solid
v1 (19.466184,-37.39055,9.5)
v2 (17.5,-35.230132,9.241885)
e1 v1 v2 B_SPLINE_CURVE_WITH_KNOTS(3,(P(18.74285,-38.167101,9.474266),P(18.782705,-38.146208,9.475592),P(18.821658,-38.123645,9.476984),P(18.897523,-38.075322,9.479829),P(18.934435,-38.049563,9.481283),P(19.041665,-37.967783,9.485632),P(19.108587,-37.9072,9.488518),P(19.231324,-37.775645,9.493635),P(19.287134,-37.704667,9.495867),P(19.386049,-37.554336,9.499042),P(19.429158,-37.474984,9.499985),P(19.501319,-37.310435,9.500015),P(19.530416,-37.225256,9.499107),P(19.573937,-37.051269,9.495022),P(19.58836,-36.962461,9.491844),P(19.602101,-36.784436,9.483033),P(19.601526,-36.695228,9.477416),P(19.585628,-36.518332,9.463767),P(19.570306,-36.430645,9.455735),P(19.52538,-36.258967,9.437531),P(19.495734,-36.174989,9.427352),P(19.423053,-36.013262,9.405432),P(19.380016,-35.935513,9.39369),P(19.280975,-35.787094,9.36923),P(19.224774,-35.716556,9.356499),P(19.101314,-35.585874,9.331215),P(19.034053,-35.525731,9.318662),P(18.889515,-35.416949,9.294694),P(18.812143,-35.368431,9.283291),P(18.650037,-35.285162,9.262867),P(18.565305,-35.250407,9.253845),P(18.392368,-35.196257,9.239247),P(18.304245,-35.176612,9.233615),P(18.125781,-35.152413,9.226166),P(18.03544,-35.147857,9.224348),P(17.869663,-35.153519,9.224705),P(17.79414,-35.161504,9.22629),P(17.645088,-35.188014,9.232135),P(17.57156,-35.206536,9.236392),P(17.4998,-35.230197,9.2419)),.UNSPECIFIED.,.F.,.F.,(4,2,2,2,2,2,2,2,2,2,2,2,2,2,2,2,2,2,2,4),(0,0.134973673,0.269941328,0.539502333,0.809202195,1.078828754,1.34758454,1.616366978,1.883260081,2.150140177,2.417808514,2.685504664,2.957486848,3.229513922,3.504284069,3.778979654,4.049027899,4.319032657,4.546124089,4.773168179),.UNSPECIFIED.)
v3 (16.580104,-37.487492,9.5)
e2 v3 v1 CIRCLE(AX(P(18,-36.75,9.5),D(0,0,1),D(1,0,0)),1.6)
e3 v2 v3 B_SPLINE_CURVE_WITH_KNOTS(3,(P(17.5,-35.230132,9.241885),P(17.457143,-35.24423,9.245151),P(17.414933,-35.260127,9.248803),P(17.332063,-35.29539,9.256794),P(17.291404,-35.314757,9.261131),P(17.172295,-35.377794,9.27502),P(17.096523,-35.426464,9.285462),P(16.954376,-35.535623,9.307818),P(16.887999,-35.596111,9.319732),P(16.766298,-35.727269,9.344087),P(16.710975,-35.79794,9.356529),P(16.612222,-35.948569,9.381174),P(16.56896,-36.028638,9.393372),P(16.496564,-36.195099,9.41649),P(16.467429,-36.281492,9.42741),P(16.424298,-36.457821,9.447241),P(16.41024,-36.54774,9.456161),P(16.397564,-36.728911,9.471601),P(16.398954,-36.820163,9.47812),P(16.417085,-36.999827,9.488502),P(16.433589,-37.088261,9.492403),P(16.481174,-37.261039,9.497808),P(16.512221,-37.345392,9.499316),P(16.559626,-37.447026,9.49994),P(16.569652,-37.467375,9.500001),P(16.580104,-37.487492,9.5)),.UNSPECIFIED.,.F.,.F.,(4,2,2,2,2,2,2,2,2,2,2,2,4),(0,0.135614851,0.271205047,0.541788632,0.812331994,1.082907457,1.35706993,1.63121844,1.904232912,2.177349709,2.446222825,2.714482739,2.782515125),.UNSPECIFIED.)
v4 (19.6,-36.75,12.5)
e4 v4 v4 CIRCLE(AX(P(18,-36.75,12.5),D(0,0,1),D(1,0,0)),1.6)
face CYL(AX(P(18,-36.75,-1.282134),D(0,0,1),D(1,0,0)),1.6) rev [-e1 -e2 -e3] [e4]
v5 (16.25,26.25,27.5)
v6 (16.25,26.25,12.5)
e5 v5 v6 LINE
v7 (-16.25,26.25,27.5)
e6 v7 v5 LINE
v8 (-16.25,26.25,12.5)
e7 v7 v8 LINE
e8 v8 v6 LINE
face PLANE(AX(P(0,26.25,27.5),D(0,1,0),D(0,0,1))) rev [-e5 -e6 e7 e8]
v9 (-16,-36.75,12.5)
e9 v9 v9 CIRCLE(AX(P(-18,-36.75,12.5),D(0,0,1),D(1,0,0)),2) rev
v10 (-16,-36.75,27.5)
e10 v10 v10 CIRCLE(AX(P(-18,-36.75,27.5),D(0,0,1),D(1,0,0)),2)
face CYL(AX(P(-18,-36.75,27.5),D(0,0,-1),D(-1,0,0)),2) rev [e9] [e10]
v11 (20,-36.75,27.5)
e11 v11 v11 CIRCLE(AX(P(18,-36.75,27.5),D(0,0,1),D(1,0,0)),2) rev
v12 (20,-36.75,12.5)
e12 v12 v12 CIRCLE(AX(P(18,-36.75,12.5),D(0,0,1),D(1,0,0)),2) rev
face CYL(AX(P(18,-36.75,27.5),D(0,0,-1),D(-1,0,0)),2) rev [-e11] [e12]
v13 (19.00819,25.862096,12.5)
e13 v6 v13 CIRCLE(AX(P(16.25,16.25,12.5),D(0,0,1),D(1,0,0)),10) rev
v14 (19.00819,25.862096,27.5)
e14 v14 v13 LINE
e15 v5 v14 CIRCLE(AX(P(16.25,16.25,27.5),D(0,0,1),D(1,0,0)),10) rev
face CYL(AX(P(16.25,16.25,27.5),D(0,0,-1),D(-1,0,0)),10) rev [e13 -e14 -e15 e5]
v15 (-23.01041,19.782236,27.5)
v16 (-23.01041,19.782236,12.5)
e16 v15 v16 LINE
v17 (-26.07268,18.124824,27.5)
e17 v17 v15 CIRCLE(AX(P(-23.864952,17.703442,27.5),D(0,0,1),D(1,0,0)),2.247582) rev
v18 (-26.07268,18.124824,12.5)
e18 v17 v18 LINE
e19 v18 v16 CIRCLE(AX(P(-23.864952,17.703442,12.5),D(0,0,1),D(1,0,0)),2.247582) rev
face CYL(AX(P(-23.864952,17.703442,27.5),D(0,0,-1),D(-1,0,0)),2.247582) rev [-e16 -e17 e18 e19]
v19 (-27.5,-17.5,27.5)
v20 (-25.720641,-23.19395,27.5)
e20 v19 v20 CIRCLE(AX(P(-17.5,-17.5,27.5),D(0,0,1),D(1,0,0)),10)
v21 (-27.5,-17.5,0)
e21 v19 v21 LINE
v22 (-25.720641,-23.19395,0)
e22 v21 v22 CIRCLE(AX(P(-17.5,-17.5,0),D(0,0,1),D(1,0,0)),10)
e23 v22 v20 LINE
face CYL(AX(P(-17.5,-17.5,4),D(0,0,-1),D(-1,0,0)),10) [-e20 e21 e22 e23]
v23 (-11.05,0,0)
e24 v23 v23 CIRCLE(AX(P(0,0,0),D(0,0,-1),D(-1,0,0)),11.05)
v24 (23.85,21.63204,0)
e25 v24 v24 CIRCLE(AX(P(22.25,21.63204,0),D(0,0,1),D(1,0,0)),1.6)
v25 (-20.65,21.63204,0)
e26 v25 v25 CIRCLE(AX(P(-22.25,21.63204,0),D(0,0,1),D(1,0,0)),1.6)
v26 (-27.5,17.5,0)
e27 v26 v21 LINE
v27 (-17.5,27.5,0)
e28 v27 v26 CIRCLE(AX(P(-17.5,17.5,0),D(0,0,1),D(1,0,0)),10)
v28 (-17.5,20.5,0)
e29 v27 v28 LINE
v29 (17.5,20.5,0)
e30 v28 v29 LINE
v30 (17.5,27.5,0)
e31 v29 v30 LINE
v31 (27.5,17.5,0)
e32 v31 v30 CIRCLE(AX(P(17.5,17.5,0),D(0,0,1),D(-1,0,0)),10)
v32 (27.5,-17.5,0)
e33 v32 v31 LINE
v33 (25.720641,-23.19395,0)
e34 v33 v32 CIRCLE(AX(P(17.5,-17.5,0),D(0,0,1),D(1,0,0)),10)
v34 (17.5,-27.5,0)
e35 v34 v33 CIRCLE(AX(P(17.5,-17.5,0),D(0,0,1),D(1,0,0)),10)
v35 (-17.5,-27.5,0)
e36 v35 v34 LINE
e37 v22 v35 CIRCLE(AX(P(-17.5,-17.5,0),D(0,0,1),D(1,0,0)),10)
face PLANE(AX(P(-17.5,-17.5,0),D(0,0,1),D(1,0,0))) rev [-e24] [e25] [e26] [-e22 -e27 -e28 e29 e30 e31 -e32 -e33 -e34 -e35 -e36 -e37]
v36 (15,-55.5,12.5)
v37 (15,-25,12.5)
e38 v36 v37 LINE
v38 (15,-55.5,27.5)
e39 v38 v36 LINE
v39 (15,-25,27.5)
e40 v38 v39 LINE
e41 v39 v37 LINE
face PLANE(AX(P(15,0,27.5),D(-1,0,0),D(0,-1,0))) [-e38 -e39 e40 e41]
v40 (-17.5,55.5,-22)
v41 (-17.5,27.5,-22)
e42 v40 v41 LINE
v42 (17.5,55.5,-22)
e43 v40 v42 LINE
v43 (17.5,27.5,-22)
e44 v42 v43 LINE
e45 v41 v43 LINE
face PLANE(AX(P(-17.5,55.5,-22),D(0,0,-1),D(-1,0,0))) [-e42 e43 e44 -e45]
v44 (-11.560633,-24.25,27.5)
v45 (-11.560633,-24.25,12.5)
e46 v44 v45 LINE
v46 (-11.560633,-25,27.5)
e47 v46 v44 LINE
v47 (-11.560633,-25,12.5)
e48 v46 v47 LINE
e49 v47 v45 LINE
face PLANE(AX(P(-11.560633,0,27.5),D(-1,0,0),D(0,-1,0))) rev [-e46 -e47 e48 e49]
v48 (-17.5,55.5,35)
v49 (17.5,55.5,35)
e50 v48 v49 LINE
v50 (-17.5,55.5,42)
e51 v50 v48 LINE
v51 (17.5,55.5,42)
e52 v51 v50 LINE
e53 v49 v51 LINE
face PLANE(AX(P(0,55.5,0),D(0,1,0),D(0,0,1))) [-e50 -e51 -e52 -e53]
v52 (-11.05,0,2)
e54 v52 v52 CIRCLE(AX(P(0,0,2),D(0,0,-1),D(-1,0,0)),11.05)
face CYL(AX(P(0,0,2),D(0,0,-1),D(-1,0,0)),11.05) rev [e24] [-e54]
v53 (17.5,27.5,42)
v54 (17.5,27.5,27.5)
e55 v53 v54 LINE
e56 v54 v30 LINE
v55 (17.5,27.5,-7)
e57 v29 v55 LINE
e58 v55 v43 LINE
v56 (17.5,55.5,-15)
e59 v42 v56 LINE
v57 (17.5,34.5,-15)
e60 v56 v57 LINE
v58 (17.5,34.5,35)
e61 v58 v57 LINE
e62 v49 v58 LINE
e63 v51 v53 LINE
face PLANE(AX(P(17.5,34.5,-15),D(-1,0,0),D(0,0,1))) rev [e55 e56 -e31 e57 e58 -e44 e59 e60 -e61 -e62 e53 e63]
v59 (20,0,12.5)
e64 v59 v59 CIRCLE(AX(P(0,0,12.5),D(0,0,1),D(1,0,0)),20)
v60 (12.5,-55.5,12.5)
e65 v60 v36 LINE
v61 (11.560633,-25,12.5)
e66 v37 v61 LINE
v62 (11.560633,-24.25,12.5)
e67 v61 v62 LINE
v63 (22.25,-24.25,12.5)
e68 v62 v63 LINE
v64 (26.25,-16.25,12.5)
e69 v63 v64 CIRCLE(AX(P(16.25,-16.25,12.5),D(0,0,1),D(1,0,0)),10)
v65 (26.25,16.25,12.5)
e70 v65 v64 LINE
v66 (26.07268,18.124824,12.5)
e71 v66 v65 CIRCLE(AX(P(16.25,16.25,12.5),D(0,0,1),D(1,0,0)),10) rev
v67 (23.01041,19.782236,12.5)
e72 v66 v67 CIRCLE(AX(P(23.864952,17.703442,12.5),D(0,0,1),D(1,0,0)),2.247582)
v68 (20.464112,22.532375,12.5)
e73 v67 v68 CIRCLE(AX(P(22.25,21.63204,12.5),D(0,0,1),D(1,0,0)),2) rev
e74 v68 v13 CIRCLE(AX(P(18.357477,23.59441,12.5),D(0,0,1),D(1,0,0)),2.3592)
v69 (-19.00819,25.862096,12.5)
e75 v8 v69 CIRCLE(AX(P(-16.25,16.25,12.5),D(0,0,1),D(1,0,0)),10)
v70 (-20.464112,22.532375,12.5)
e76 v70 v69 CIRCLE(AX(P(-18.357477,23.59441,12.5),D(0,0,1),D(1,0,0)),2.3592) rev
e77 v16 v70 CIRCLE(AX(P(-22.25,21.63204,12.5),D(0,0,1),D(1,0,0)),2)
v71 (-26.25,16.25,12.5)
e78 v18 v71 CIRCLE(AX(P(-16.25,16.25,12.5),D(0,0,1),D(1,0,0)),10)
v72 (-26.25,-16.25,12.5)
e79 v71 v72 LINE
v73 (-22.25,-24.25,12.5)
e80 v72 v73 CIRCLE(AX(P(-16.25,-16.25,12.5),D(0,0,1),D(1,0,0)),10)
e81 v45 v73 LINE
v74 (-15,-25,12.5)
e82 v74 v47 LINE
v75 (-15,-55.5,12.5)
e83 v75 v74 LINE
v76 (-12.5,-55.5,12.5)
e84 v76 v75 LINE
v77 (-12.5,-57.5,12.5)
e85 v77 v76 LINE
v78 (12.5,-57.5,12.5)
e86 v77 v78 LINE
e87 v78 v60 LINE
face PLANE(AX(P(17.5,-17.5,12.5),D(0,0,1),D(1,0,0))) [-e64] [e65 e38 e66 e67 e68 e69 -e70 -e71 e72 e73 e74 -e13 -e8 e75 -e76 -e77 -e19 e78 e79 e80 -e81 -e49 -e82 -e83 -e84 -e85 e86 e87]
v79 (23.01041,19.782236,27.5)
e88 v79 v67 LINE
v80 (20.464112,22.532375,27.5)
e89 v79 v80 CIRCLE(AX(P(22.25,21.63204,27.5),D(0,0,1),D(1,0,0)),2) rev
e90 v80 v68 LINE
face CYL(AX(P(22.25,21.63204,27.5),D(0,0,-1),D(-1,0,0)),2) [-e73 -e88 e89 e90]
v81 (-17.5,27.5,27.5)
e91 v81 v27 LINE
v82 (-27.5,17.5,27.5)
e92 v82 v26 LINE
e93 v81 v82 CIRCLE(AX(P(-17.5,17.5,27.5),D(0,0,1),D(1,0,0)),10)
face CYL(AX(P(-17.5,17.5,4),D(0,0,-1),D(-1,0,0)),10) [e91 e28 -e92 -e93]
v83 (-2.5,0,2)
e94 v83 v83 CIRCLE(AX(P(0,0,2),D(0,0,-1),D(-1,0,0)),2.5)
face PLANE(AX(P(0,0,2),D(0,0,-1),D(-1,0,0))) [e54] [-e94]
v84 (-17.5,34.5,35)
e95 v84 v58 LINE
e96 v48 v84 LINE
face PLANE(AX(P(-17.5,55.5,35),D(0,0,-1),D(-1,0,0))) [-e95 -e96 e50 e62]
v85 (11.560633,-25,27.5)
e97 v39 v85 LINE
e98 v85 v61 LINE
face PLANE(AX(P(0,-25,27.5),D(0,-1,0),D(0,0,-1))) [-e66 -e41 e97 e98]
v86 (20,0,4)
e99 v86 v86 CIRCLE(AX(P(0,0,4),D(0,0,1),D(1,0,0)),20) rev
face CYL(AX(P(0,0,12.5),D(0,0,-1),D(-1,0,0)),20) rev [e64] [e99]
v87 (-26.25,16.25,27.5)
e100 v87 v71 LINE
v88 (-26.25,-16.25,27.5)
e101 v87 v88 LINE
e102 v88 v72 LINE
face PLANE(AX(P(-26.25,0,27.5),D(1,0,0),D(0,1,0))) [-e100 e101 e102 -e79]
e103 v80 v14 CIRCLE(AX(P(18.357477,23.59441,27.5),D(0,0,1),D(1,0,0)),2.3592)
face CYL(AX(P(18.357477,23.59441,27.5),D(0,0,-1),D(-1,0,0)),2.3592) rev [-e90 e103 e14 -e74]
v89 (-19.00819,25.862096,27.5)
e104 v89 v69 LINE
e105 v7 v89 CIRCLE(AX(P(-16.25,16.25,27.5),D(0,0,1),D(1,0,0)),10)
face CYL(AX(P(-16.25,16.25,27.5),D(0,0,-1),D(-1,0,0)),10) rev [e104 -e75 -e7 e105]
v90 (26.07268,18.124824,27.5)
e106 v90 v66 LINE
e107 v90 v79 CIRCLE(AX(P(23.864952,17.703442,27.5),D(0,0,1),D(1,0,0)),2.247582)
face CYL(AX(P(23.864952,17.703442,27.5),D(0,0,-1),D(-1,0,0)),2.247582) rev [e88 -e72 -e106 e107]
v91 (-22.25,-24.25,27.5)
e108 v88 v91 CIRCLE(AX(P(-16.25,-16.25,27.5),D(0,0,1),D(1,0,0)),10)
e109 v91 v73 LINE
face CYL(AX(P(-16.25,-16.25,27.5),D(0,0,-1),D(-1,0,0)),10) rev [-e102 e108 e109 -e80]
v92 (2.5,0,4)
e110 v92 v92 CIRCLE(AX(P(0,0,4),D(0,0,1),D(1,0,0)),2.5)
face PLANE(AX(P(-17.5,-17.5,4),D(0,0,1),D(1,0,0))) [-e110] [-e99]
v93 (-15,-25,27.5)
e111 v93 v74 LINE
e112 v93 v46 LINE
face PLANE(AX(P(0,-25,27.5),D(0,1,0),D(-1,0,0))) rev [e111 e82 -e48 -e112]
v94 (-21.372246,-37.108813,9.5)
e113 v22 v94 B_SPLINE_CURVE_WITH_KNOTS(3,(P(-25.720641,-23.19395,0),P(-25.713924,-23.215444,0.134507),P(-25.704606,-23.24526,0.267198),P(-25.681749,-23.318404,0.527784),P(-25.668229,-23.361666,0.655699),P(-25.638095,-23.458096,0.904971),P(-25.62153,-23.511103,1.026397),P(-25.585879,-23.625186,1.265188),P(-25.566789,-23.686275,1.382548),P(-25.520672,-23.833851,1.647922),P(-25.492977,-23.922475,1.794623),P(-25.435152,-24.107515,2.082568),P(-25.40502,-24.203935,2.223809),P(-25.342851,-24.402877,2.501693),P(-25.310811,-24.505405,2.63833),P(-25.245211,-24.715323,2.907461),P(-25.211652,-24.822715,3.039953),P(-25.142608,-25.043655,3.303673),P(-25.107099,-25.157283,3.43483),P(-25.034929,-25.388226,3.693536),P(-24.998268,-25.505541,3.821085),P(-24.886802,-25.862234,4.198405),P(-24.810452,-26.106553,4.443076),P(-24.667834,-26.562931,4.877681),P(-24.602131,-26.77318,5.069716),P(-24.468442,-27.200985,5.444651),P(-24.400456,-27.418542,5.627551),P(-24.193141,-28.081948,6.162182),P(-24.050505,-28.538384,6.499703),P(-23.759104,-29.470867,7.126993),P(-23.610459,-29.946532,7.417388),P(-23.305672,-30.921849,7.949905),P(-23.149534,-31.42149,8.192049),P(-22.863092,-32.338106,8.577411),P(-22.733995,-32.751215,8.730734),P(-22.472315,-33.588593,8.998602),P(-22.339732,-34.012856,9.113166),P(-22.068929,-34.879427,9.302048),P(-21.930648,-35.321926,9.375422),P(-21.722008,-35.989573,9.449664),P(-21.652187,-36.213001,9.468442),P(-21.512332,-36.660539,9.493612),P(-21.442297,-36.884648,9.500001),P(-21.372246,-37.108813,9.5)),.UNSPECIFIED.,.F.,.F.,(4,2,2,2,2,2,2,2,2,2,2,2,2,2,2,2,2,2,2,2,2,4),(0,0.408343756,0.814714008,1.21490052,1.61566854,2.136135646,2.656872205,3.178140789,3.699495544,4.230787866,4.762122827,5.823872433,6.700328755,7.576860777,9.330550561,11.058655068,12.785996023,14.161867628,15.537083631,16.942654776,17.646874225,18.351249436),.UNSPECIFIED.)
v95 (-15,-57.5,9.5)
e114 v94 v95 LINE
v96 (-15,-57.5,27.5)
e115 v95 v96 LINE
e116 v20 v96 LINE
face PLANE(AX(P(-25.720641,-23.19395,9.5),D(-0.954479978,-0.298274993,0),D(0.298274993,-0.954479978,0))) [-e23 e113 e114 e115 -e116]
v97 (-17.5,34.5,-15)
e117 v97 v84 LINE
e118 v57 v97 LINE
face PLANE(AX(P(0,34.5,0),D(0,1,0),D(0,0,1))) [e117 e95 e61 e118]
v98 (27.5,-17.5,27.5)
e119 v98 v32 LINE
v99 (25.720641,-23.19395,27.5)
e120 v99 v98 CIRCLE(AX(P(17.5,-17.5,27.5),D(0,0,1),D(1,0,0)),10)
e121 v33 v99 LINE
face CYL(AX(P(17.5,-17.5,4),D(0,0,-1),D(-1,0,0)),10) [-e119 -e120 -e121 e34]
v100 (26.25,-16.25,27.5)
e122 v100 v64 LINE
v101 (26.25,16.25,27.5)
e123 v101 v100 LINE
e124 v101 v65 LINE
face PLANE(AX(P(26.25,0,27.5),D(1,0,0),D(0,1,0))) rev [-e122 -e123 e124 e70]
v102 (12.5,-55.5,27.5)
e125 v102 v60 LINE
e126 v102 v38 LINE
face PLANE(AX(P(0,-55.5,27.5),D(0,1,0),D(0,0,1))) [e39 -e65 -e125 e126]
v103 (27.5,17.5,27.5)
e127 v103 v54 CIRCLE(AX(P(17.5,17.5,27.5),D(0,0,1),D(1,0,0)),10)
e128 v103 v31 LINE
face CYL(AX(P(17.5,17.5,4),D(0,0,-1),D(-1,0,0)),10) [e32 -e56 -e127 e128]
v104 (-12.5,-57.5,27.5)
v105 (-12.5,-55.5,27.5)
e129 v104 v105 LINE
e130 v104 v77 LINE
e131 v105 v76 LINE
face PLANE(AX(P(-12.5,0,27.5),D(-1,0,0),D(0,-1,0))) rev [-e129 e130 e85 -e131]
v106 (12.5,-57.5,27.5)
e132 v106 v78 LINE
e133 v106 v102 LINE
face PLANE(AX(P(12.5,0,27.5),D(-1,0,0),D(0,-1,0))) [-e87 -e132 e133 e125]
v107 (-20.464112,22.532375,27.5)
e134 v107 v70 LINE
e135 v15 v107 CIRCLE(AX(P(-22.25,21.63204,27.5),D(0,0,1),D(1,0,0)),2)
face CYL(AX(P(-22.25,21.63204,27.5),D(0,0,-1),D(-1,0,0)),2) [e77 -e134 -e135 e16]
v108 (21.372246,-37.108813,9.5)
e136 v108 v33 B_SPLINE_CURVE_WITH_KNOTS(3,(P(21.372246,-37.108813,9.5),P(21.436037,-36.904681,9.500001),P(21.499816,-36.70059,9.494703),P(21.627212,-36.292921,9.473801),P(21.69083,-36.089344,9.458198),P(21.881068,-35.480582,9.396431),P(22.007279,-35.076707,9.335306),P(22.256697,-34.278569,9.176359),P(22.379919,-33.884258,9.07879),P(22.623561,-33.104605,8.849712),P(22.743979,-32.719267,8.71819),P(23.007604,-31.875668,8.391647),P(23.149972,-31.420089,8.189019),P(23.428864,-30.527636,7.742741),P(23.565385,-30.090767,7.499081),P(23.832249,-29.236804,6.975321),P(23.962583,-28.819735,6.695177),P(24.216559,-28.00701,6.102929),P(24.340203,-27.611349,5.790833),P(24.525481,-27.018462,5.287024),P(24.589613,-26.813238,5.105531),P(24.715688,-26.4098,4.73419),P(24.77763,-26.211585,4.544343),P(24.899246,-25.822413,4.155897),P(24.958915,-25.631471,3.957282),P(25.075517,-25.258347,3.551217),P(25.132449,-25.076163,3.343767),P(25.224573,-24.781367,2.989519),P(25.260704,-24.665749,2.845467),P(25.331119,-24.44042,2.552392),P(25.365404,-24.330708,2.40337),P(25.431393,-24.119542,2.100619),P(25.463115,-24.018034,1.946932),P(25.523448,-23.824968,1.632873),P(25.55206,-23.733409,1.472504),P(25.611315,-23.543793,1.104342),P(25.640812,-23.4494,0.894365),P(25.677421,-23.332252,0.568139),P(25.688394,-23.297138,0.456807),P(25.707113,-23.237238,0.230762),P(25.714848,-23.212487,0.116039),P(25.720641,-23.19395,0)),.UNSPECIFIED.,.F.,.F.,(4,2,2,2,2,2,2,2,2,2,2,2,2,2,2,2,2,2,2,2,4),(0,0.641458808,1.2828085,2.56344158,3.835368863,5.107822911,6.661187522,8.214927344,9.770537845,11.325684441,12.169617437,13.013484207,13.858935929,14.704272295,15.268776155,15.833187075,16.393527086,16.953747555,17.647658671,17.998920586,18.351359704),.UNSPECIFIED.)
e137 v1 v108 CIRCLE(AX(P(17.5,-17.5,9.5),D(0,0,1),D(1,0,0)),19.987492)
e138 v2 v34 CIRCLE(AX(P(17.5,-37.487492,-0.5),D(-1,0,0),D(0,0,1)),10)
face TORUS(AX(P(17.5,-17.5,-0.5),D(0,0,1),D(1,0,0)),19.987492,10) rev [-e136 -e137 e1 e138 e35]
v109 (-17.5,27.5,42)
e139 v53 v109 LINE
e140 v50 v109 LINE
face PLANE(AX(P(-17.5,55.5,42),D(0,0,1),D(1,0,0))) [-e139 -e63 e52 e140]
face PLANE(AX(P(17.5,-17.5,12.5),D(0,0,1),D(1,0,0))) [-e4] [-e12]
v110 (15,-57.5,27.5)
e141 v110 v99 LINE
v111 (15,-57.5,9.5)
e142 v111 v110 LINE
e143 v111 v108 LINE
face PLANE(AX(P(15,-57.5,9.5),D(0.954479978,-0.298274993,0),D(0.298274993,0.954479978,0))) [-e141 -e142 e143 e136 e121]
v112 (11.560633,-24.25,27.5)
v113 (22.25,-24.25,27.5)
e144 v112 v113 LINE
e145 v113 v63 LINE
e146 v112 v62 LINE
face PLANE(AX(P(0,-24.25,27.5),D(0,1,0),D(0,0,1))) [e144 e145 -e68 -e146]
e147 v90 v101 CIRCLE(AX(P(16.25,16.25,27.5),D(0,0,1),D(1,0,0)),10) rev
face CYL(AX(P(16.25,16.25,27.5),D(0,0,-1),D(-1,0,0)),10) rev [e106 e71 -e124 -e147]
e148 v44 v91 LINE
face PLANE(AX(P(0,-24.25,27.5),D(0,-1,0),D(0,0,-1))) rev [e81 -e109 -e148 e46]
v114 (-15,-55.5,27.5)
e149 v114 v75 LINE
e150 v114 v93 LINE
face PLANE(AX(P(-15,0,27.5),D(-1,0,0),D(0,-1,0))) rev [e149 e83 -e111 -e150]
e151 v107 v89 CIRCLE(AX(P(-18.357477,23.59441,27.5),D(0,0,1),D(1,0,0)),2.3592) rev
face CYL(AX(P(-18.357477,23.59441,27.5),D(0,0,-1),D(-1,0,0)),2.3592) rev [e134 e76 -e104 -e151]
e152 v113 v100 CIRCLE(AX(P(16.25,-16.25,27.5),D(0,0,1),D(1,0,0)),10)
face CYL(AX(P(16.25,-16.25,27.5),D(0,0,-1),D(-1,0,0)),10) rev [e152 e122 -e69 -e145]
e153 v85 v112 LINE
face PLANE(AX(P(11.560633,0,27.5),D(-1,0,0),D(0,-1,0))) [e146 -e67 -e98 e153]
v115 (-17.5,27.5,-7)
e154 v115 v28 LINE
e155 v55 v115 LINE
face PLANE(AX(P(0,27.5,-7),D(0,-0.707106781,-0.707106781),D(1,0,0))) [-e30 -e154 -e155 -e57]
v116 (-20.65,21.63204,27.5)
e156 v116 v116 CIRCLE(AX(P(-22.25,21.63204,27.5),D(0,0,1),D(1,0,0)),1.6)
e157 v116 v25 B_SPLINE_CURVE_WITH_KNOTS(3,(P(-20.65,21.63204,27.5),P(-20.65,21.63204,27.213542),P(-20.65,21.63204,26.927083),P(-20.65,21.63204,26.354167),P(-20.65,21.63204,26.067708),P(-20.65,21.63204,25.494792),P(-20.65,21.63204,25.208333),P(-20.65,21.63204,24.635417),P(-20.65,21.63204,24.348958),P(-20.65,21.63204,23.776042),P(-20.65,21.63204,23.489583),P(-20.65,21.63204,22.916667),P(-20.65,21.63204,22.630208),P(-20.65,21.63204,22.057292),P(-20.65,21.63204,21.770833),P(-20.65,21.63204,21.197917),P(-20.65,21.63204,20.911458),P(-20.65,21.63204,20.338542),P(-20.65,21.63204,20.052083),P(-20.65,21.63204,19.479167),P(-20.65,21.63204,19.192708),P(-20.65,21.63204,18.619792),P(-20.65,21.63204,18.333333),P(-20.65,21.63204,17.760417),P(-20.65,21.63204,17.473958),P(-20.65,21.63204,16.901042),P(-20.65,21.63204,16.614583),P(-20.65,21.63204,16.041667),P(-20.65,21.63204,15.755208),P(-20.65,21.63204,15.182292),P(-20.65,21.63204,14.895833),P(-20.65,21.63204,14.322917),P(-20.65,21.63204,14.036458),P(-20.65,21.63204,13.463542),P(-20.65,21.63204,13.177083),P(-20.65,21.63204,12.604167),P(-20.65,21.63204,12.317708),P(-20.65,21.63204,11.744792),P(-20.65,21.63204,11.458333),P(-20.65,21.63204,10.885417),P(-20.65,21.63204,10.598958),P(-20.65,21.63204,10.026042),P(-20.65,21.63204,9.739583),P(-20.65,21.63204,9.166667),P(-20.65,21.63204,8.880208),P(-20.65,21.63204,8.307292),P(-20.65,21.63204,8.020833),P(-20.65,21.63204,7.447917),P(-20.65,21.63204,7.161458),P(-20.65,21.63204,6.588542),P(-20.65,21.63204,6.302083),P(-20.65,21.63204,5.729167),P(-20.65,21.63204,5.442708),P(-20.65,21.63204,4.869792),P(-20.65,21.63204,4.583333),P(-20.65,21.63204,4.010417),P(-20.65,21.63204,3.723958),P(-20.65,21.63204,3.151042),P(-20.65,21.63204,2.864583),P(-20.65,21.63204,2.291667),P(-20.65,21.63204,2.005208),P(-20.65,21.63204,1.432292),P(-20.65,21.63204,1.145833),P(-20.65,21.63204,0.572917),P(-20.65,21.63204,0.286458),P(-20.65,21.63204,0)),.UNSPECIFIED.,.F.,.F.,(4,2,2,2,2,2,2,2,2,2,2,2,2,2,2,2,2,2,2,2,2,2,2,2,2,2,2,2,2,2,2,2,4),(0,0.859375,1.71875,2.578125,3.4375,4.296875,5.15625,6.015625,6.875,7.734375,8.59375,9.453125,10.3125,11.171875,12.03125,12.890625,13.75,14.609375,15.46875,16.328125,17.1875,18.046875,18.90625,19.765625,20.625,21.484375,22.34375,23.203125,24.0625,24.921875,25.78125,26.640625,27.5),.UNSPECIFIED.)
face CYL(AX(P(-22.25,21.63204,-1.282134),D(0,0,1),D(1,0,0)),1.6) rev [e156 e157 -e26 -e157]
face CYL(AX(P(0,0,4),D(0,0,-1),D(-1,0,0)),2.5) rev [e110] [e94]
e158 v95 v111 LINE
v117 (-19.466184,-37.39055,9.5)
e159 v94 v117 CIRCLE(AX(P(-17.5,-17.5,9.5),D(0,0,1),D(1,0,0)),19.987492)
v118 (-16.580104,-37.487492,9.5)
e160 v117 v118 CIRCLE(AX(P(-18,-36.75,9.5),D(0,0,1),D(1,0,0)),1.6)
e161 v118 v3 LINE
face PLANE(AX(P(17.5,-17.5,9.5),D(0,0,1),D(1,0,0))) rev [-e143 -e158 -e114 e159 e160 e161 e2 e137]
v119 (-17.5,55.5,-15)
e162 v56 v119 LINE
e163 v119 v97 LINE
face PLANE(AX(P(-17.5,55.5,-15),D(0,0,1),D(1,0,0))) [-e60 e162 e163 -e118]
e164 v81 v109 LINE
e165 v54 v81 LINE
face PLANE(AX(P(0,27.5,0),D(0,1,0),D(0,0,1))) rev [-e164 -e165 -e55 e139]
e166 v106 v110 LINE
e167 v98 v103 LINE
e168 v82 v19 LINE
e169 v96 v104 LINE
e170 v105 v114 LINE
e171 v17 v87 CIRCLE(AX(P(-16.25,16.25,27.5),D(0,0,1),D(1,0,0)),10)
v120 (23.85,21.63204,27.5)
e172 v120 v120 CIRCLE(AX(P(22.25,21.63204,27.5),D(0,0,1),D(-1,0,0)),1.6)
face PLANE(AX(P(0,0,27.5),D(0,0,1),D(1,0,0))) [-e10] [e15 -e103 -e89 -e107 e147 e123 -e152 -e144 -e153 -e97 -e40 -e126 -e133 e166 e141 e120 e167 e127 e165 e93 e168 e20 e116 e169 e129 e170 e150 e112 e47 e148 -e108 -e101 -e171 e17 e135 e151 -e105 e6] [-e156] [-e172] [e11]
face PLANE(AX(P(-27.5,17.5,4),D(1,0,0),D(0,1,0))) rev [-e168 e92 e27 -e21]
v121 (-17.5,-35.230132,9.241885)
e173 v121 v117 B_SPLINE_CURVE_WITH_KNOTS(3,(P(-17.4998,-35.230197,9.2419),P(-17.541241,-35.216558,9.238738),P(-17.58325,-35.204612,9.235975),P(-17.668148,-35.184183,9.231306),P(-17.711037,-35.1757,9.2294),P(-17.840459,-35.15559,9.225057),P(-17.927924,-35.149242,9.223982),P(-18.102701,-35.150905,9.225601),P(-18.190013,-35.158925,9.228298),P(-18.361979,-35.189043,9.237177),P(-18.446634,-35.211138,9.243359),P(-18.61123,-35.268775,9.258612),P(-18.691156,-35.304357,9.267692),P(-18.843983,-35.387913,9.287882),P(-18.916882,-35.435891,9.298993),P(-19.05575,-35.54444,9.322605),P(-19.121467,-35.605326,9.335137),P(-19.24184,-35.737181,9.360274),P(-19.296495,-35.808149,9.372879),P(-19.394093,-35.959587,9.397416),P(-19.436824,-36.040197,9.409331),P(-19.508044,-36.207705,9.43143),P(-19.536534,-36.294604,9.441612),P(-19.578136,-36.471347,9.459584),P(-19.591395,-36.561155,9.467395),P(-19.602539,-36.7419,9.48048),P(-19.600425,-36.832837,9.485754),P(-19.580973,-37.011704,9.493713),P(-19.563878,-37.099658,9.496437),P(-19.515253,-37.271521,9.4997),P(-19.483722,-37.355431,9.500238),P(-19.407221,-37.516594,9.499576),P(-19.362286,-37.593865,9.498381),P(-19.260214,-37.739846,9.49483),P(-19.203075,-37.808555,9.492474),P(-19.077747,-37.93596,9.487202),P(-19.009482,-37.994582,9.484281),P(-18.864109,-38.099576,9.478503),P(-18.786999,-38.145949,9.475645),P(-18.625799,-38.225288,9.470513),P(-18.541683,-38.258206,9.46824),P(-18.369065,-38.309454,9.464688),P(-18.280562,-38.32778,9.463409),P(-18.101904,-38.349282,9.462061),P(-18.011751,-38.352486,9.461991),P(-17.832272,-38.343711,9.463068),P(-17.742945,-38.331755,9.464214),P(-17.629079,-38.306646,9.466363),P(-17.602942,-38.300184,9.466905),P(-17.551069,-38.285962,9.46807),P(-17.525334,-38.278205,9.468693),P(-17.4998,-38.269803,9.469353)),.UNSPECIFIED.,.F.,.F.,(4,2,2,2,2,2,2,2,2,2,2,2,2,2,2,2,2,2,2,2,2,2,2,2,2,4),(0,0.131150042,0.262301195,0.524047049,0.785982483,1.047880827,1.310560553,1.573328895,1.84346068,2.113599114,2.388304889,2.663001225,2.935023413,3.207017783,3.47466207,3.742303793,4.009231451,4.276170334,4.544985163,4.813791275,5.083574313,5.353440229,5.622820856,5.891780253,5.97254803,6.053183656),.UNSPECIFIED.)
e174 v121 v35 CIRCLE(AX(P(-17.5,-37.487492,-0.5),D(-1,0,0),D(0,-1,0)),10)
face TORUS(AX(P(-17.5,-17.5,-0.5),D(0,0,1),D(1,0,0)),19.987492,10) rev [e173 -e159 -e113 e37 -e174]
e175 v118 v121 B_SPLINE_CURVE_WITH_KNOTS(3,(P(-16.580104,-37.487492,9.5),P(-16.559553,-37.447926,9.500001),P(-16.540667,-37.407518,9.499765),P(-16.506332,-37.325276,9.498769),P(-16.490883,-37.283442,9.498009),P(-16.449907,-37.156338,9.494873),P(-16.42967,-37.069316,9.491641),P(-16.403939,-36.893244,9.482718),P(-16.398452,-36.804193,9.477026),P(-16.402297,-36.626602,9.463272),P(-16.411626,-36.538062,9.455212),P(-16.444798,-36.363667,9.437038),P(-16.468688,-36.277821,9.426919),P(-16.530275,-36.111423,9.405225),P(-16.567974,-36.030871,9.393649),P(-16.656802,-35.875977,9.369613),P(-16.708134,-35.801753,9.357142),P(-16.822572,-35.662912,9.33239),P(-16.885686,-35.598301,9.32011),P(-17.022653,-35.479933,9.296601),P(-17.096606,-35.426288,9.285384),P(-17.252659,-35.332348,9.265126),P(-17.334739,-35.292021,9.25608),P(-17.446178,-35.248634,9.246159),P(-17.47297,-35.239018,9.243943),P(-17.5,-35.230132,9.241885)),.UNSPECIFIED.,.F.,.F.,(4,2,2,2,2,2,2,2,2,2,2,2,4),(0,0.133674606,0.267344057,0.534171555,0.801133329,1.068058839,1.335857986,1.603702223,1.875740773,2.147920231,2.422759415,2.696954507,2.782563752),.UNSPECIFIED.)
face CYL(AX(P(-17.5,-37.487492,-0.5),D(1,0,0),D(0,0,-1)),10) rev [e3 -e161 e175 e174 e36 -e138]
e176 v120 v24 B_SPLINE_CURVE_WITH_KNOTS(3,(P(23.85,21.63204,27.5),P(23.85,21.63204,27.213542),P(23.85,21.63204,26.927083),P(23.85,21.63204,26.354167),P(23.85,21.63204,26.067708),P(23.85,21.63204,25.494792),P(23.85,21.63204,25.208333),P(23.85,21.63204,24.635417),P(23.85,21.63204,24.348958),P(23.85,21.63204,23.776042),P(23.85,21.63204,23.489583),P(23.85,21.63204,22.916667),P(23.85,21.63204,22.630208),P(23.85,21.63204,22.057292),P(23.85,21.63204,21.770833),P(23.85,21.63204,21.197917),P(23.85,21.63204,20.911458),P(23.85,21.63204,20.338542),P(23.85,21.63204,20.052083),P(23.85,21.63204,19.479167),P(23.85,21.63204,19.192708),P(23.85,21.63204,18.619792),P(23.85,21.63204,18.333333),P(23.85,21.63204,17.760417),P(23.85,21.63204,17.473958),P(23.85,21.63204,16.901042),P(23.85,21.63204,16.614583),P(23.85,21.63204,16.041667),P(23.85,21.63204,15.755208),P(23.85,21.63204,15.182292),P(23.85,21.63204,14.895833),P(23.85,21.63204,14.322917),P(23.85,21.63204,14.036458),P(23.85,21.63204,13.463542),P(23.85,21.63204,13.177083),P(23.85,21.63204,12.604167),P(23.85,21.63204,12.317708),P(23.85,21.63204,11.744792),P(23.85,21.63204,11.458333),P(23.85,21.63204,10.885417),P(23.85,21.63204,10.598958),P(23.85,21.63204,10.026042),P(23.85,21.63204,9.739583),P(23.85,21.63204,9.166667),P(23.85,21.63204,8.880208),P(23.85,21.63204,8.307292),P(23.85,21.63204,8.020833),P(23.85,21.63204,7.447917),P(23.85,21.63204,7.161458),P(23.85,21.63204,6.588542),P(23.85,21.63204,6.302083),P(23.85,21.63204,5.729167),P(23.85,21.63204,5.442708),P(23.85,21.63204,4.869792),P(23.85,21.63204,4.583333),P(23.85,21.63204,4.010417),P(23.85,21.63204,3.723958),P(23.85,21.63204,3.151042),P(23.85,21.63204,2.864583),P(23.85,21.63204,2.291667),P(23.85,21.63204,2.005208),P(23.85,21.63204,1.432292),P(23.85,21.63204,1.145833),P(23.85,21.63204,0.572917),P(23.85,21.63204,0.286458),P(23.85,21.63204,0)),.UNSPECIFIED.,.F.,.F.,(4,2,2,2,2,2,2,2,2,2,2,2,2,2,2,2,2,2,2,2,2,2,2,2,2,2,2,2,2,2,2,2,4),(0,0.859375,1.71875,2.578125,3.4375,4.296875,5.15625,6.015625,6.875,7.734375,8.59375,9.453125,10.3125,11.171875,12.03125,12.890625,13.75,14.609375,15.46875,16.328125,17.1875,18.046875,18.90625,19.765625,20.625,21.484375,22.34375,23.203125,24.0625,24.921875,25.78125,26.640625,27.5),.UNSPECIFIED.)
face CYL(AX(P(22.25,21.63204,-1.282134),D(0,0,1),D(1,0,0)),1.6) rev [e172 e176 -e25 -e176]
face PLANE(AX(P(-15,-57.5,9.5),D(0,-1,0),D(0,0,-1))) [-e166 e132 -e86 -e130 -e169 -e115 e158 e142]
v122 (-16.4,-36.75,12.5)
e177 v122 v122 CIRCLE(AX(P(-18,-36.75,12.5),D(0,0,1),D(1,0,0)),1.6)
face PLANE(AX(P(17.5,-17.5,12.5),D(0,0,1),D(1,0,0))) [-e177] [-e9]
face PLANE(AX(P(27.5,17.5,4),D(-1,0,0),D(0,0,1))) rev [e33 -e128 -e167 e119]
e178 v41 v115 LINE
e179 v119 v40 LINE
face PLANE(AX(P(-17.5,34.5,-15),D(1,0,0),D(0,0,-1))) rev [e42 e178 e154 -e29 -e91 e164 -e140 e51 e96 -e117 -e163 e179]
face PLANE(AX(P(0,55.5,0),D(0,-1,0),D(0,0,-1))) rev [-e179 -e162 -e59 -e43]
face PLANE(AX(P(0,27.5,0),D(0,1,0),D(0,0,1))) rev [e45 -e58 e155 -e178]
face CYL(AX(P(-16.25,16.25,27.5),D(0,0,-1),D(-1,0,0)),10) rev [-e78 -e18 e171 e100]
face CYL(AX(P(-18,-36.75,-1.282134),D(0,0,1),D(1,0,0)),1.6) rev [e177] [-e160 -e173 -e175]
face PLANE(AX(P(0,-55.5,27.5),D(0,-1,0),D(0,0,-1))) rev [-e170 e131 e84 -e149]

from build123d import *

# Parameters (mm, degrees)
CROQUIS4_R                  = 2.5
SALIENTE_EXTRUIR1_DEPTH     = 4
CROQUIS5_R                  = 20
SALIENTE_EXTRUIR2_DEPTH     = 8.5
SALIENTE_EXTRUIR4_START     = -3
SALIENTE_EXTRUIR4_DEPTH     = 3
REDONDEO1_R                 = 10
SALIENTE_EXTRUIR5_OUTLINE_R = 2
SALIENTE_EXTRUIR5_DEPTH     = 15
CROQUIS9_R                  = 1.6
CORTAR_EXTRUIR1_DEPTH       = 70.417217007
CROQUIS11_W                 = 35
CROQUIS11_H                 = 50
SALIENTE_EXTRUIR7_DEPTH     = 7
CROQUIS12_W                 = 35
CROQUIS12_H                 = 7
SALIENTE_EXTRUIR8_DEPTH     = 28
CHAFL_N2_SIZE               = 7
CROQUIS13_R                 = 11.05
CORTAR_EXTRUIR2_DEPTH       = 2


# Read off the part's stored shape, not the designer's step: Saliente-Extruir5
with BuildPart() as part:
    # Croquis4 → Saliente-Extruir1 (new body)
    with BuildSketch(Plane.XY):
        with BuildLine():
            Line((-17.5, 27.5), (17.5, 27.5))
            ThreePointArc((17.5, 27.5), (24.571067812, 24.571067812), (27.5, 17.5))
            Line((27.5, 17.5), (27.5, -17.5))
            ThreePointArc((27.5, -17.5), (24.571067812, -24.571067812), (17.5, -27.5))
            Line((17.5, -27.5), (-17.5, -27.5))
            ThreePointArc((-17.5, -27.5), (-24.571067812, -24.571067812), (-27.5, -17.5))
            Line((-27.5, -17.5), (-27.5, 17.5))
            ThreePointArc((-27.5, 17.5), (-24.571067812, 24.571067812), (-17.5, 27.5))
        make_face()
        Circle(CROQUIS4_R, mode=Mode.SUBTRACT)
    extrude(amount=SALIENTE_EXTRUIR1_DEPTH)

    # Croquis5 → Saliente-Extruir2 (add)
    with BuildSketch(Plane.XY.offset(4)):
        with BuildLine():
            Line((-17.5, 27.5), (17.5, 27.5))
            ThreePointArc((17.5, 27.5), (24.571067812, 24.571067812), (27.5, 17.5))
            Line((27.5, 17.5), (27.5, -17.5))
            ThreePointArc((27.5, -17.5), (24.571067812, -24.571067812), (17.5, -27.5))
            Line((17.5, -27.5), (-17.5, -27.5))
            ThreePointArc((-17.5, -27.5), (-24.571067812, -24.571067812), (-27.5, -17.5))
            Line((-27.5, -17.5), (-27.5, 17.5))
            ThreePointArc((-27.5, 17.5), (-24.571067812, 24.571067812), (-17.5, 27.5))
        make_face()
        Circle(CROQUIS5_R, mode=Mode.SUBTRACT)
    extrude(amount=SALIENTE_EXTRUIR2_DEPTH)

    # Croquis6 → Saliente-Extruir4 (add)
    with BuildSketch(Plane.XY.offset(12.5).offset(SALIENTE_EXTRUIR4_START)):
        with BuildLine():
            Line((-25.720640569, -23.193950178), (-15, -57.5))
            Line((-15, -57.5), (15, -57.5))
            Line((15, -57.5), (25.720640569, -23.193950178))
            ThreePointArc((25.720640569, -23.193950178), (22.140069947, -26.358315353), (17.5, -27.5))
            Line((17.5, -27.5), (-17.5, -27.5))
            ThreePointArc((-17.5, -27.5), (-22.140069947, -26.358315353), (-25.720640569, -23.193950178))
        make_face()
    extrude(amount=SALIENTE_EXTRUIR4_DEPTH)

    # Redondeo1
    # the kernel refuses this fillet: 10 mm, written as the material it adds along each edge
    with BuildSketch(Plane(origin=(17.5, -17.5, 9.5), x_dir=(-0.31521717271258337, 0.949019564617656, 0), z_dir=(-0.949019564617656, -0.31521717271258337, 0))) as redondeo1_piece_1_section:
        with BuildLine():
            CenterArc((19.987492178, 10), REDONDEO1_R, 182.865983983, 87.134016017)
            Line((19.987492178, 0), (10, 0))
            Line((10, 0), (10, 9.5))
        make_face()
    redondeo1_piece_1 = revolve(axis=Axis((17.5, -17.5, 9.5), (0, 0, -1)), revolution_arc=198.373924806, mode=Mode.PRIVATE)
    redondeo1_piece_1 = split(redondeo1_piece_1, bisect_by=Plane(origin=(27.5, -26.624186886, 2.060383814), z_dir=(-1, 0, 0)), keep=Keep.TOP, mode=Mode.PRIVATE)
    redondeo1_piece_1 = redondeo1_piece_1 - Plane(origin=(0, 0, 2.060383814), x_dir=(1, 0, 0), z_dir=(0, 0, -1)) * Cylinder(20, 80, mode=Mode.PRIVATE)
    redondeo1_piece_1 = split(redondeo1_piece_1, bisect_by=Plane(origin=(24.437894836, -27.298736526, 2.060383814), z_dir=(-0.9544799780350299, 0.2982749931359464, 0)), keep=Keep.TOP, mode=Mode.PRIVATE)
    add(redondeo1_piece_1)
    with BuildSketch(Plane(origin=(-17.5, -17.5, 9.5), x_dir=(0, -1, 0), z_dir=(1, 0, 0))) as redondeo1_piece_2_section:
        with BuildLine():
            CenterArc((19.987492178, 10), REDONDEO1_R, 182.865983983, 87.134016017)
            Line((19.987492178, 0), (10, 0))
            Line((10, 0), (10, 9.5))
        make_face()
    redondeo1_piece_2 = revolve(axis=Axis((-17.5, -17.5, 9.5), (0, 0, -1)), revolution_arc=198.373924806, mode=Mode.PRIVATE)
    redondeo1_piece_2 = split(redondeo1_piece_2, bisect_by=Plane(origin=(-27.5, -26.624186886, 2.060383814), z_dir=(1, 0, 0)), keep=Keep.TOP, mode=Mode.PRIVATE)
    redondeo1_piece_2 = redondeo1_piece_2 - Plane(origin=(0, 0, 2.060383814), x_dir=(1, 0, 0), z_dir=(0, 0, -1)) * Cylinder(20, 80, mode=Mode.PRIVATE)
    redondeo1_piece_2 = split(redondeo1_piece_2, bisect_by=Plane(origin=(-24.437894836, -27.298736526, 2.060383814), z_dir=(0.9544799780350299, 0.29827499313594635, 0)), keep=Keep.TOP, mode=Mode.PRIVATE)
    add(redondeo1_piece_2)
    with BuildSketch(Plane(origin=(17.5, -27.5, 9.5), x_dir=(0, 0, -1), z_dir=(-1, 0, 0))) as redondeo1_piece_3:
        with BuildLine():
            CenterArc((10, 9.987492178), REDONDEO1_R, 180, 87.134016017)
            Line((0, 9.987492178), (0, 0))
            Line((0, 0), (9.5, 0))
        make_face()
    extrude(amount=35)

    # Saliente-Extruir5 outline → Saliente-Extruir5 (add)
    with BuildSketch(Plane.XY.offset(12.5)):
        with BuildLine():
            ThreePointArc((-27.5, -17.5), (-27.04479978, -20.482749931), (-25.720640569, -23.193950178))
            Line((-25.720640569, -23.193950178), (-15, -57.5))
            Line((-15, -57.5), (-12.5, -57.5))
            Line((-12.5, -57.5), (-12.5, -55.5))
            Line((-12.5, -55.5), (-15, -55.5))
            Line((-15, -55.5), (-15, -25))
            Line((-15, -25), (-11.560632513, -25))
            Line((-11.560632513, -25), (-11.560632513, -24.25))
            Line((-11.560632513, -24.25), (-22.25, -24.25))
            ThreePointArc((-22.25, -24.25), (-25.19427191, -20.722135955), (-26.25, -16.25))
            Line((-26.25, -16.25), (-26.25, 16.25))
            ThreePointArc((-26.25, 16.25), (-26.205571214, 17.191595354), (-26.072679638, 18.12482392))
            ThreePointArc((-26.072679638, 18.12482392), (-24.934779512, 19.680078923), (-23.010409798, 19.782235789))
            ThreePointArc((-23.010409798, 19.782235789), (-20.782444846, 20.273260806), (-20.464111601, 22.532375088))
            ThreePointArc((-20.464111601, 22.532375088), (-20.519074057, 24.539569231), (-19.008189542, 25.862096049))
            ThreePointArc((-19.008189542, 25.862096049), (-17.64266642, 26.152549179), (-16.25, 26.25))
            Line((-16.25, 26.25), (16.25, 26.25))
            ThreePointArc((16.25, 26.25), (17.64266642, 26.152549179), (19.008189542, 25.862096049))
            ThreePointArc((19.008189542, 25.862096049), (20.519074057, 24.539569231), (20.464111601, 22.532375088))
            ThreePointArc((20.464111601, 22.532375088), (20.782444846, 20.273260806), (23.010409798, 19.782235789))
            ThreePointArc((23.010409798, 19.782235789), (24.934779512, 19.680078923), (26.072679638, 18.12482392))
            ThreePointArc((26.072679638, 18.12482392), (26.205571214, 17.191595354), (26.25, 16.25))
            Line((26.25, 16.25), (26.25, -16.25))
            ThreePointArc((26.25, -16.25), (25.19427191, -20.722135955), (22.25, -24.25))
            Line((22.25, -24.25), (11.560632513, -24.25))
            Line((11.560632513, -24.25), (11.560632513, -25))
            Line((11.560632513, -25), (15, -25))
            Line((15, -25), (15, -55.5))
            Line((15, -55.5), (12.5, -55.5))
            Line((12.5, -55.5), (12.5, -57.5))
            Line((12.5, -57.5), (15, -57.5))
            Line((15, -57.5), (25.720640569, -23.193950178))
            ThreePointArc((25.720640569, -23.193950178), (27.04479978, -20.482749931), (27.5, -17.5))
            Line((27.5, -17.5), (27.5, 17.5))
            ThreePointArc((27.5, 17.5), (24.571067812, 24.571067812), (17.5, 27.5))
            Line((17.5, 27.5), (-17.5, 27.5))
            ThreePointArc((-17.5, 27.5), (-24.571067812, 24.571067812), (-27.5, 17.5))
            Line((-27.5, 17.5), (-27.5, -17.5))
        make_face()
        with Locations((-18, -36.75)):
            Circle(SALIENTE_EXTRUIR5_OUTLINE_R, mode=Mode.SUBTRACT)
        with Locations((18, -36.75)):
            Circle(SALIENTE_EXTRUIR5_OUTLINE_R, mode=Mode.SUBTRACT)
    extrude(amount=SALIENTE_EXTRUIR5_DEPTH)

    # Croquis9 → Cortar-Extruir1 (cut, through all)
    with BuildSketch(Plane.XY.offset(27.5)):
        with Locations((-22.25, 21.632040357)):
            Circle(CROQUIS9_R)
        with Locations((-18, -36.75)):
            Circle(CROQUIS9_R)
        with Locations((18, -36.75)):
            Circle(CROQUIS9_R)
        with Locations((22.25, 21.632040357)):
            Circle(CROQUIS9_R)
    extrude(amount=-CORTAR_EXTRUIR1_DEPTH, mode=Mode.SUBTRACT)

    # Croquis11 → Saliente-Extruir7 (add)
    with BuildSketch(Plane(origin=(0, 27.5, 0), x_dir=(1, 0, 0), z_dir=(0, 1, 0))):
        with Locations((0, -10)):
            Rectangle(CROQUIS11_W, CROQUIS11_H)
    extrude(amount=SALIENTE_EXTRUIR7_DEPTH)

    # Croquis12 → Saliente-Extruir8 (add)
    with BuildSketch(Plane.XZ.offset(-27.5)):
        with Locations((0, 38.5)):
            Rectangle(CROQUIS12_W, CROQUIS12_H)
        with Locations((0, -18.5)):
            Rectangle(CROQUIS12_W, CROQUIS12_H)
    extrude(amount=-SALIENTE_EXTRUIR8_DEPTH)

    # Chaflán2
    chafl_n2_edges = [part.edges().sort_by_distance(p)[0] for p in [
        (0, 27.5, 0),
    ]]
    chamfer(chafl_n2_edges, length=CHAFL_N2_SIZE)

    # Croquis13 → Cortar-Extruir2 (cut)
    with BuildSketch(Plane(origin=(0, 0, 0), x_dir=(-1, 0, 0), z_dir=(0, 0, -1))):
        Circle(CROQUIS13_R)
    extrude(amount=-CORTAR_EXTRUIR2_DEPTH, mode=Mode.SUBTRACT)


solid = part.part
